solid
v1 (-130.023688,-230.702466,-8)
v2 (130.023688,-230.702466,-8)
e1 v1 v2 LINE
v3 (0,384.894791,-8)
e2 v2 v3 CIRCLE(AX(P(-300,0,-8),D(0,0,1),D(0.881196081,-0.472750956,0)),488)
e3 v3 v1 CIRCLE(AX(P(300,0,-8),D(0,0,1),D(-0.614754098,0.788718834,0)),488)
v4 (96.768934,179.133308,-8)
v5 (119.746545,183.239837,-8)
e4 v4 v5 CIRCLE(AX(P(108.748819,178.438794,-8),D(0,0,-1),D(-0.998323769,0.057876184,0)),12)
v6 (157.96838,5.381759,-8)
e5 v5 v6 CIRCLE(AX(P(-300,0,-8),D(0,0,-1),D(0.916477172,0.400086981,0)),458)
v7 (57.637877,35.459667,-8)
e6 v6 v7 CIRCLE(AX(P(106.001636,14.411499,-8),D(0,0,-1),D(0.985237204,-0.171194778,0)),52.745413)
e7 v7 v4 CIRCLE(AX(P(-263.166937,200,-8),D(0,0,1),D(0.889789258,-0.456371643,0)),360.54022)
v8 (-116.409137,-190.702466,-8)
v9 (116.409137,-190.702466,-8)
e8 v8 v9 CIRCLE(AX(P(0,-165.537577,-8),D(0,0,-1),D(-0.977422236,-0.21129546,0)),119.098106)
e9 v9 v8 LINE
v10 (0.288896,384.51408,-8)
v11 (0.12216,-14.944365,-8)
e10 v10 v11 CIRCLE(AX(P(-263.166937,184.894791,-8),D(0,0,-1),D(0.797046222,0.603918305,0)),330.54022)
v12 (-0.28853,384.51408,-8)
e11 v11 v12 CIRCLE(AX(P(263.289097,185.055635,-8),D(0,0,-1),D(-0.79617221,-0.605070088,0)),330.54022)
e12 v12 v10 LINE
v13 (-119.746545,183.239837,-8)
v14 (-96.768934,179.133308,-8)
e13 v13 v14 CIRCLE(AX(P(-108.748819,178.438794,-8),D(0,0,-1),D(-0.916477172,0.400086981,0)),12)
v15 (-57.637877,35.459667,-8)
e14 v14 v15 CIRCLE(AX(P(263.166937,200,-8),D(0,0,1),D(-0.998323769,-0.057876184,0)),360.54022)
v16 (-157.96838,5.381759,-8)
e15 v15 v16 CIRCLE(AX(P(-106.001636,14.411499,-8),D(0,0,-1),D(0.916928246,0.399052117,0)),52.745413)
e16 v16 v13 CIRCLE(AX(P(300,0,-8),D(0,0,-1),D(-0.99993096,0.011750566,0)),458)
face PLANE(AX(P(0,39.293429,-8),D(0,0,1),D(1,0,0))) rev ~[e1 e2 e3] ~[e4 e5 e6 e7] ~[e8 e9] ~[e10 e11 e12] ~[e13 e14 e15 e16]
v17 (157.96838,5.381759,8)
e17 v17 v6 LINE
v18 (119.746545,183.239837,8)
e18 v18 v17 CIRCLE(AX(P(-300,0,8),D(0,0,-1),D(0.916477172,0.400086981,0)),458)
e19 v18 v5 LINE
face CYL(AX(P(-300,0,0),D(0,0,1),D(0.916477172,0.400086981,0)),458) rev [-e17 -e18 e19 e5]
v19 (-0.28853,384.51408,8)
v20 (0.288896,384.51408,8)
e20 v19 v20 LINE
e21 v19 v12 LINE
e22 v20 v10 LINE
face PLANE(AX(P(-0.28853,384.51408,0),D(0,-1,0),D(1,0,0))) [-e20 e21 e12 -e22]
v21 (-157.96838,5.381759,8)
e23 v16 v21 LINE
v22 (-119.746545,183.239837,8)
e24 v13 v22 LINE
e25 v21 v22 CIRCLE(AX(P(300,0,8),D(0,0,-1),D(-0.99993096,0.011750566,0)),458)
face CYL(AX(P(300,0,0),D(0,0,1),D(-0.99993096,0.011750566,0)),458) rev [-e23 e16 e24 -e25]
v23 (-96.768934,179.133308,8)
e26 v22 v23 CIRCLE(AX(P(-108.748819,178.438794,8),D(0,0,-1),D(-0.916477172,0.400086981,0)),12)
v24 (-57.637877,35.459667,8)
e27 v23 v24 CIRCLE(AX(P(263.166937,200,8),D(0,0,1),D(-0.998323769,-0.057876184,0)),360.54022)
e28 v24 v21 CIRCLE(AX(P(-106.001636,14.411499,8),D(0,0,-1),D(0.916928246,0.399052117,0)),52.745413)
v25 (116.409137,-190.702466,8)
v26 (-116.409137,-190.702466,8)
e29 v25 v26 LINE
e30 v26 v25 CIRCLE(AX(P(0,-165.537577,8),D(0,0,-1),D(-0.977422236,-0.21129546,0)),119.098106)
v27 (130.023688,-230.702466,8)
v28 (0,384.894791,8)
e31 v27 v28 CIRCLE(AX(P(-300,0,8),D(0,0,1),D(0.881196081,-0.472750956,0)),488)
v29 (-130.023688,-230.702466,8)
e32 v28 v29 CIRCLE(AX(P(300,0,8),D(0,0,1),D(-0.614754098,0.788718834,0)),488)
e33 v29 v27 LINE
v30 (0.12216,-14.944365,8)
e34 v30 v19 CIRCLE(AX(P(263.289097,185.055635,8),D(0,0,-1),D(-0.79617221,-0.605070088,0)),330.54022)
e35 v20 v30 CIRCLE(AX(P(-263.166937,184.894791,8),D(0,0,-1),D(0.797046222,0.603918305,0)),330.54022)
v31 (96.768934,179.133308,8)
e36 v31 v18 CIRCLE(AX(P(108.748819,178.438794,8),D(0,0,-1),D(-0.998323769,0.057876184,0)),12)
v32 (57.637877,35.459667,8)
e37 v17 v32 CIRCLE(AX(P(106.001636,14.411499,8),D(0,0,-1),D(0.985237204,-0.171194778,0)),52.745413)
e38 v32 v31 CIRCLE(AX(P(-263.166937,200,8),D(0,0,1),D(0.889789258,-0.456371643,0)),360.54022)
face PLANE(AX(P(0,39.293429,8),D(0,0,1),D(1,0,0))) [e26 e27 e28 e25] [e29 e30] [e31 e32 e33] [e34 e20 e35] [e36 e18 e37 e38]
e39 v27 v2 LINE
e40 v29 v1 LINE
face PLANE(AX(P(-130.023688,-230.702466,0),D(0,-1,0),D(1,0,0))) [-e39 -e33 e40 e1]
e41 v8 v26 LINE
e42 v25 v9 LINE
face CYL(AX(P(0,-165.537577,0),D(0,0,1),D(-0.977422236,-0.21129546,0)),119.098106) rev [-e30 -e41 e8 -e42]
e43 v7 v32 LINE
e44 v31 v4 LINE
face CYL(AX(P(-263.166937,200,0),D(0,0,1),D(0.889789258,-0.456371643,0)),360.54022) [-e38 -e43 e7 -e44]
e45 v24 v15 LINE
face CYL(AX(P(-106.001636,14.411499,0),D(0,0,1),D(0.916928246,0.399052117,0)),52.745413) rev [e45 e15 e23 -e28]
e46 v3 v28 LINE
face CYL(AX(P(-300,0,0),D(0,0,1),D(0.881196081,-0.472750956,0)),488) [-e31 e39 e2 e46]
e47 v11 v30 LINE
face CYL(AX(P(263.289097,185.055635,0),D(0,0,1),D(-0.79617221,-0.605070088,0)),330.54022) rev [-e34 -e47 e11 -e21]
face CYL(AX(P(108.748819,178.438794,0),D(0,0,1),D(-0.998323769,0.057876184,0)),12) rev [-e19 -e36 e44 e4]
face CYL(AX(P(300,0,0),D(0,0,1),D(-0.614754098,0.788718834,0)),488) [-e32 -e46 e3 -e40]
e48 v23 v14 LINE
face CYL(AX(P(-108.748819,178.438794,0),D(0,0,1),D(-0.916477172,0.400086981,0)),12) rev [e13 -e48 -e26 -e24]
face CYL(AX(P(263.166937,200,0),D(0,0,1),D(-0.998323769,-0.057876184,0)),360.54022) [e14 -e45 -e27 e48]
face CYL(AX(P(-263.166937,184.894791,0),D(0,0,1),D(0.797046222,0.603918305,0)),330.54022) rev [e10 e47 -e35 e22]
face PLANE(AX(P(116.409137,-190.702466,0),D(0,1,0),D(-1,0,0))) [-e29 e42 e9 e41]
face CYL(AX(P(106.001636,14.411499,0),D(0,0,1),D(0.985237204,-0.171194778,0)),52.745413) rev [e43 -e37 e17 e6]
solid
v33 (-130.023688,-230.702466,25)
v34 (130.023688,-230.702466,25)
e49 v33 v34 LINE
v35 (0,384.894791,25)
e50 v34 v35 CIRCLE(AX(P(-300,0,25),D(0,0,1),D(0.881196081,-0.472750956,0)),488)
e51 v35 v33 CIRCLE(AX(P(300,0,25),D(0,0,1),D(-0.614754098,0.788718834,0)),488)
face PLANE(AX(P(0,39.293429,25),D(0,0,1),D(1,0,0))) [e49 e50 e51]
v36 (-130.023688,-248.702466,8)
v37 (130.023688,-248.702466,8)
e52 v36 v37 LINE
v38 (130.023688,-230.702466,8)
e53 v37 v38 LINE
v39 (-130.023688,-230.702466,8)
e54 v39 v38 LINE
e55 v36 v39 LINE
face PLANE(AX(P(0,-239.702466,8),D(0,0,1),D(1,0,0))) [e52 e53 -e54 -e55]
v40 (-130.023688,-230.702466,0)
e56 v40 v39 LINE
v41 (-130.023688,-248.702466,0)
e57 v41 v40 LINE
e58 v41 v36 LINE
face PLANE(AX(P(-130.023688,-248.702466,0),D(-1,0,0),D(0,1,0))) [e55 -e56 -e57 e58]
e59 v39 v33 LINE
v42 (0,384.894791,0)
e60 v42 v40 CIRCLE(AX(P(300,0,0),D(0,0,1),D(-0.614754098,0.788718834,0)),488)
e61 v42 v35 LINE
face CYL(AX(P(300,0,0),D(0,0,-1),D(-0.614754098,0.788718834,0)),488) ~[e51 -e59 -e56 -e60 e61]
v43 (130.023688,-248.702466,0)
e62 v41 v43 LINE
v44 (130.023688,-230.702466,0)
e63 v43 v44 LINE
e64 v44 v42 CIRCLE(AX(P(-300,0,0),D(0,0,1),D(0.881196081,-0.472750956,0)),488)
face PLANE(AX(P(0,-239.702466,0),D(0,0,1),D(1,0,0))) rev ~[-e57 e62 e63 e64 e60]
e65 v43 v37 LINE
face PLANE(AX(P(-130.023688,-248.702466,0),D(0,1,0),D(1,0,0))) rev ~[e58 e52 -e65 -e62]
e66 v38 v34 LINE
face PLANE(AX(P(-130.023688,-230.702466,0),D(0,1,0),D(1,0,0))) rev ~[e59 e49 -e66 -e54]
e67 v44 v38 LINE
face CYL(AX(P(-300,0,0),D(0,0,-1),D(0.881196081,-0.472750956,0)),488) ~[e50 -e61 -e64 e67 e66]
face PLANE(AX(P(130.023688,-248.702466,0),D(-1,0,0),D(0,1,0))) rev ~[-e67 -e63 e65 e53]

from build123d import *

# Parameters (mm, degrees)
F1_DEPTH = 8
F2_DEPTH = 25
F0_W     = 260.0473753379
F0_H     = 18
F3_DEPTH = 8


with BuildPart() as f1:
    # F0 (on Top) → F1 (new body, symmetric)
    with BuildSketch(Plane.XY):
        with BuildLine():
            ThreePointArc((130.023687669, -230.7024664879), (177.4658542143, 100.8481931393), (0, 384.8947908195))
            ThreePointArc((0, 384.8947908195), (-177.4658542143, 100.8481931393), (-130.023687669, -230.7024664879))
            Line((-130.023687669, -230.7024664879), (130.023687669, -230.7024664879))
        make_face()
        with BuildLine():
            ThreePointArc((-116.4091368779, -190.7024664879), (0, -46.4394716511), (116.4091368779, -190.7024664879))
            Line((116.4091368779, -190.7024664879), (-116.4091368779, -190.7024664879))
        make_face(mode=Mode.SUBTRACT)
        with BuildLine():
            ThreePointArc((-157.9683795481, 5.3817593866), (-147.7770049437, 96.2276147666), (-119.7465449836, 183.2398373016))
            ThreePointArc((-119.7465449836, 183.2398373016), (-106.6376449739, 190.2516231903), (-96.768933689, 179.1333077427))
            ThreePointArc((-96.768933689, 179.1333077427), (-84.7015708466, 105.2542818333), (-57.6378772255, 35.4596674073))
            ThreePointArc((-57.6378772255, 35.4596674073), (-90.8551676662, -36.1123876178), (-157.9683795481, 5.3817593866))
        make_face(mode=Mode.SUBTRACT)
        with BuildLine():
            ThreePointArc((0.1221596343, -14.9443653121), (-67.2509481397, 184.7158011806), (-0.2885299828, 384.5140801762))
            Line((-0.2885299828, 384.5140801762), (0.2888961989, 384.5140801762))
            ThreePointArc((0.2888961989, 384.5140801762), (67.3732536733, 184.7568211845), (0.1221596342, -14.9443653121))
        make_face(mode=Mode.SUBTRACT)
        with BuildLine():
            ThreePointArc((57.6378772255, 35.4596674073), (84.7015708466, 105.2542818333), (96.768933689, 179.1333077427))
            ThreePointArc((96.768933689, 179.1333077427), (106.6376449739, 190.2516231903), (119.7465449836, 183.2398373016))
            ThreePointArc((119.7465449836, 183.2398373016), (147.7770049437, 96.2276147666), (157.9683795481, 5.3817593866))
            ThreePointArc((157.9683795481, 5.3817593866), (90.8551676662, -36.1123876178), (57.6378772255, 35.4596674073))
        make_face(mode=Mode.SUBTRACT)
    extrude(amount=F1_DEPTH, both=True)


with BuildPart() as f2:
    # F0 (on Top) → F2 (new body)
    with BuildSketch(Plane.XY):
        with BuildLine():
            ThreePointArc((130.023687669, -230.7024664879), (177.4658542143, 100.8481931393), (0, 384.8947908195))
            ThreePointArc((0, 384.8947908195), (-177.4658542143, 100.8481931393), (-130.023687669, -230.7024664879))
            Line((-130.023687669, -230.7024664879), (130.023687669, -230.7024664879))
        make_face()
        with BuildLine():
            ThreePointArc((-116.4091368779, -190.7024664879), (0, -46.4394716511), (116.4091368779, -190.7024664879))
            Line((116.4091368779, -190.7024664879), (-116.4091368779, -190.7024664879))
        make_face(mode=Mode.SUBTRACT)
        with BuildLine():
            ThreePointArc((-157.9683795481, 5.3817593866), (-147.7770049437, 96.2276147666), (-119.7465449836, 183.2398373016))
            ThreePointArc((-119.7465449836, 183.2398373016), (-106.6376449739, 190.2516231903), (-96.768933689, 179.1333077427))
            ThreePointArc((-96.768933689, 179.1333077427), (-84.7015708466, 105.2542818333), (-57.6378772255, 35.4596674073))
            ThreePointArc((-57.6378772255, 35.4596674073), (-90.8551676662, -36.1123876178), (-157.9683795481, 5.3817593866))
        make_face(mode=Mode.SUBTRACT)
        with BuildLine():
            ThreePointArc((0.1221596343, -14.9443653121), (-67.2509481397, 184.7158011806), (-0.2885299828, 384.5140801762))
            Line((-0.2885299828, 384.5140801762), (0.2888961989, 384.5140801762))
            ThreePointArc((0.2888961989, 384.5140801762), (67.3732536733, 184.7568211845), (0.1221596342, -14.9443653121))
        make_face(mode=Mode.SUBTRACT)
        with BuildLine():
            ThreePointArc((57.6378772255, 35.4596674073), (84.7015708466, 105.2542818333), (96.768933689, 179.1333077427))
            ThreePointArc((96.768933689, 179.1333077427), (106.6376449739, 190.2516231903), (119.7465449836, 183.2398373016))
            ThreePointArc((119.7465449836, 183.2398373016), (147.7770049437, 96.2276147666), (157.9683795481, 5.3817593866))
            ThreePointArc((157.9683795481, 5.3817593866), (90.8551676662, -36.1123876178), (57.6378772255, 35.4596674073))
        make_face(mode=Mode.SUBTRACT)
        with BuildLine():
            Line((-116.4091368779, -190.7024664879), (116.4091368779, -190.7024664879))
            ThreePointArc((116.4091368779, -190.7024664879), (0, -46.4394716511), (-116.4091368779, -190.7024664879))
        make_face()
        with BuildLine():
            ThreePointArc((-96.768933689, 179.1333077427), (-106.6376449739, 190.2516231903), (-119.7465449836, 183.2398373016))
            ThreePointArc((-119.7465449836, 183.2398373016), (-147.7770049437, 96.2276147666), (-157.9683795481, 5.3817593866))
            ThreePointArc((-157.9683795481, 5.3817593866), (-90.8551676662, -36.1123876178), (-57.6378772255, 35.4596674073))
            ThreePointArc((-57.6378772255, 35.4596674073), (-84.7015708466, 105.2542818333), (-96.768933689, 179.1333077427))
        make_face()
        with BuildLine():
            Line((0.2888961989, 384.5140801762), (-0.2885299828, 384.5140801762))
            ThreePointArc((-0.2885299828, 384.5140801762), (-67.2509481397, 184.7158011806), (0.1221596343, -14.9443653121))
            ThreePointArc((0.1221596342, -14.9443653121), (67.3732536733, 184.7568211845), (0.2888961989, 384.5140801762))
        make_face()
        with BuildLine():
            ThreePointArc((0, 5.4204641238), (-55.3732812405, 184.8947908195), (0, 364.3691175153))
            ThreePointArc((0, 364.3691175153), (55.3732812405, 184.8947908195), (0, 5.4204641238))
        make_face(mode=Mode.SUBTRACT)
        with BuildLine():
            ThreePointArc((0, 5.4204641238), (55.3732812405, 184.8947908195), (0, 364.3691175153))
            ThreePointArc((0, 364.3691175153), (-55.3732812405, 184.8947908195), (0, 5.4204641238))
        make_face()
        with BuildLine():
            ThreePointArc((119.7465449836, 183.2398373016), (106.6376449739, 190.2516231903), (96.768933689, 179.1333077427))
            ThreePointArc((96.768933689, 179.1333077427), (84.7015708466, 105.2542818333), (57.6378772255, 35.4596674073))
            ThreePointArc((57.6378772255, 35.4596674073), (90.8551676662, -36.1123876178), (157.9683795481, 5.3817593866))
            ThreePointArc((157.9683795481, 5.3817593866), (147.7770049437, 96.2276147666), (119.7465449836, 183.2398373016))
        make_face()
    extrude(amount=F2_DEPTH)

    # F0 (on Top) → F3 (join)
    with BuildSketch(Plane.XY):
        with Locations((0, -239.7024664879)):
            Rectangle(F0_W, F0_H)
    extrude(amount=F3_DEPTH)


solid = Compound([f1.part, f2.part])
